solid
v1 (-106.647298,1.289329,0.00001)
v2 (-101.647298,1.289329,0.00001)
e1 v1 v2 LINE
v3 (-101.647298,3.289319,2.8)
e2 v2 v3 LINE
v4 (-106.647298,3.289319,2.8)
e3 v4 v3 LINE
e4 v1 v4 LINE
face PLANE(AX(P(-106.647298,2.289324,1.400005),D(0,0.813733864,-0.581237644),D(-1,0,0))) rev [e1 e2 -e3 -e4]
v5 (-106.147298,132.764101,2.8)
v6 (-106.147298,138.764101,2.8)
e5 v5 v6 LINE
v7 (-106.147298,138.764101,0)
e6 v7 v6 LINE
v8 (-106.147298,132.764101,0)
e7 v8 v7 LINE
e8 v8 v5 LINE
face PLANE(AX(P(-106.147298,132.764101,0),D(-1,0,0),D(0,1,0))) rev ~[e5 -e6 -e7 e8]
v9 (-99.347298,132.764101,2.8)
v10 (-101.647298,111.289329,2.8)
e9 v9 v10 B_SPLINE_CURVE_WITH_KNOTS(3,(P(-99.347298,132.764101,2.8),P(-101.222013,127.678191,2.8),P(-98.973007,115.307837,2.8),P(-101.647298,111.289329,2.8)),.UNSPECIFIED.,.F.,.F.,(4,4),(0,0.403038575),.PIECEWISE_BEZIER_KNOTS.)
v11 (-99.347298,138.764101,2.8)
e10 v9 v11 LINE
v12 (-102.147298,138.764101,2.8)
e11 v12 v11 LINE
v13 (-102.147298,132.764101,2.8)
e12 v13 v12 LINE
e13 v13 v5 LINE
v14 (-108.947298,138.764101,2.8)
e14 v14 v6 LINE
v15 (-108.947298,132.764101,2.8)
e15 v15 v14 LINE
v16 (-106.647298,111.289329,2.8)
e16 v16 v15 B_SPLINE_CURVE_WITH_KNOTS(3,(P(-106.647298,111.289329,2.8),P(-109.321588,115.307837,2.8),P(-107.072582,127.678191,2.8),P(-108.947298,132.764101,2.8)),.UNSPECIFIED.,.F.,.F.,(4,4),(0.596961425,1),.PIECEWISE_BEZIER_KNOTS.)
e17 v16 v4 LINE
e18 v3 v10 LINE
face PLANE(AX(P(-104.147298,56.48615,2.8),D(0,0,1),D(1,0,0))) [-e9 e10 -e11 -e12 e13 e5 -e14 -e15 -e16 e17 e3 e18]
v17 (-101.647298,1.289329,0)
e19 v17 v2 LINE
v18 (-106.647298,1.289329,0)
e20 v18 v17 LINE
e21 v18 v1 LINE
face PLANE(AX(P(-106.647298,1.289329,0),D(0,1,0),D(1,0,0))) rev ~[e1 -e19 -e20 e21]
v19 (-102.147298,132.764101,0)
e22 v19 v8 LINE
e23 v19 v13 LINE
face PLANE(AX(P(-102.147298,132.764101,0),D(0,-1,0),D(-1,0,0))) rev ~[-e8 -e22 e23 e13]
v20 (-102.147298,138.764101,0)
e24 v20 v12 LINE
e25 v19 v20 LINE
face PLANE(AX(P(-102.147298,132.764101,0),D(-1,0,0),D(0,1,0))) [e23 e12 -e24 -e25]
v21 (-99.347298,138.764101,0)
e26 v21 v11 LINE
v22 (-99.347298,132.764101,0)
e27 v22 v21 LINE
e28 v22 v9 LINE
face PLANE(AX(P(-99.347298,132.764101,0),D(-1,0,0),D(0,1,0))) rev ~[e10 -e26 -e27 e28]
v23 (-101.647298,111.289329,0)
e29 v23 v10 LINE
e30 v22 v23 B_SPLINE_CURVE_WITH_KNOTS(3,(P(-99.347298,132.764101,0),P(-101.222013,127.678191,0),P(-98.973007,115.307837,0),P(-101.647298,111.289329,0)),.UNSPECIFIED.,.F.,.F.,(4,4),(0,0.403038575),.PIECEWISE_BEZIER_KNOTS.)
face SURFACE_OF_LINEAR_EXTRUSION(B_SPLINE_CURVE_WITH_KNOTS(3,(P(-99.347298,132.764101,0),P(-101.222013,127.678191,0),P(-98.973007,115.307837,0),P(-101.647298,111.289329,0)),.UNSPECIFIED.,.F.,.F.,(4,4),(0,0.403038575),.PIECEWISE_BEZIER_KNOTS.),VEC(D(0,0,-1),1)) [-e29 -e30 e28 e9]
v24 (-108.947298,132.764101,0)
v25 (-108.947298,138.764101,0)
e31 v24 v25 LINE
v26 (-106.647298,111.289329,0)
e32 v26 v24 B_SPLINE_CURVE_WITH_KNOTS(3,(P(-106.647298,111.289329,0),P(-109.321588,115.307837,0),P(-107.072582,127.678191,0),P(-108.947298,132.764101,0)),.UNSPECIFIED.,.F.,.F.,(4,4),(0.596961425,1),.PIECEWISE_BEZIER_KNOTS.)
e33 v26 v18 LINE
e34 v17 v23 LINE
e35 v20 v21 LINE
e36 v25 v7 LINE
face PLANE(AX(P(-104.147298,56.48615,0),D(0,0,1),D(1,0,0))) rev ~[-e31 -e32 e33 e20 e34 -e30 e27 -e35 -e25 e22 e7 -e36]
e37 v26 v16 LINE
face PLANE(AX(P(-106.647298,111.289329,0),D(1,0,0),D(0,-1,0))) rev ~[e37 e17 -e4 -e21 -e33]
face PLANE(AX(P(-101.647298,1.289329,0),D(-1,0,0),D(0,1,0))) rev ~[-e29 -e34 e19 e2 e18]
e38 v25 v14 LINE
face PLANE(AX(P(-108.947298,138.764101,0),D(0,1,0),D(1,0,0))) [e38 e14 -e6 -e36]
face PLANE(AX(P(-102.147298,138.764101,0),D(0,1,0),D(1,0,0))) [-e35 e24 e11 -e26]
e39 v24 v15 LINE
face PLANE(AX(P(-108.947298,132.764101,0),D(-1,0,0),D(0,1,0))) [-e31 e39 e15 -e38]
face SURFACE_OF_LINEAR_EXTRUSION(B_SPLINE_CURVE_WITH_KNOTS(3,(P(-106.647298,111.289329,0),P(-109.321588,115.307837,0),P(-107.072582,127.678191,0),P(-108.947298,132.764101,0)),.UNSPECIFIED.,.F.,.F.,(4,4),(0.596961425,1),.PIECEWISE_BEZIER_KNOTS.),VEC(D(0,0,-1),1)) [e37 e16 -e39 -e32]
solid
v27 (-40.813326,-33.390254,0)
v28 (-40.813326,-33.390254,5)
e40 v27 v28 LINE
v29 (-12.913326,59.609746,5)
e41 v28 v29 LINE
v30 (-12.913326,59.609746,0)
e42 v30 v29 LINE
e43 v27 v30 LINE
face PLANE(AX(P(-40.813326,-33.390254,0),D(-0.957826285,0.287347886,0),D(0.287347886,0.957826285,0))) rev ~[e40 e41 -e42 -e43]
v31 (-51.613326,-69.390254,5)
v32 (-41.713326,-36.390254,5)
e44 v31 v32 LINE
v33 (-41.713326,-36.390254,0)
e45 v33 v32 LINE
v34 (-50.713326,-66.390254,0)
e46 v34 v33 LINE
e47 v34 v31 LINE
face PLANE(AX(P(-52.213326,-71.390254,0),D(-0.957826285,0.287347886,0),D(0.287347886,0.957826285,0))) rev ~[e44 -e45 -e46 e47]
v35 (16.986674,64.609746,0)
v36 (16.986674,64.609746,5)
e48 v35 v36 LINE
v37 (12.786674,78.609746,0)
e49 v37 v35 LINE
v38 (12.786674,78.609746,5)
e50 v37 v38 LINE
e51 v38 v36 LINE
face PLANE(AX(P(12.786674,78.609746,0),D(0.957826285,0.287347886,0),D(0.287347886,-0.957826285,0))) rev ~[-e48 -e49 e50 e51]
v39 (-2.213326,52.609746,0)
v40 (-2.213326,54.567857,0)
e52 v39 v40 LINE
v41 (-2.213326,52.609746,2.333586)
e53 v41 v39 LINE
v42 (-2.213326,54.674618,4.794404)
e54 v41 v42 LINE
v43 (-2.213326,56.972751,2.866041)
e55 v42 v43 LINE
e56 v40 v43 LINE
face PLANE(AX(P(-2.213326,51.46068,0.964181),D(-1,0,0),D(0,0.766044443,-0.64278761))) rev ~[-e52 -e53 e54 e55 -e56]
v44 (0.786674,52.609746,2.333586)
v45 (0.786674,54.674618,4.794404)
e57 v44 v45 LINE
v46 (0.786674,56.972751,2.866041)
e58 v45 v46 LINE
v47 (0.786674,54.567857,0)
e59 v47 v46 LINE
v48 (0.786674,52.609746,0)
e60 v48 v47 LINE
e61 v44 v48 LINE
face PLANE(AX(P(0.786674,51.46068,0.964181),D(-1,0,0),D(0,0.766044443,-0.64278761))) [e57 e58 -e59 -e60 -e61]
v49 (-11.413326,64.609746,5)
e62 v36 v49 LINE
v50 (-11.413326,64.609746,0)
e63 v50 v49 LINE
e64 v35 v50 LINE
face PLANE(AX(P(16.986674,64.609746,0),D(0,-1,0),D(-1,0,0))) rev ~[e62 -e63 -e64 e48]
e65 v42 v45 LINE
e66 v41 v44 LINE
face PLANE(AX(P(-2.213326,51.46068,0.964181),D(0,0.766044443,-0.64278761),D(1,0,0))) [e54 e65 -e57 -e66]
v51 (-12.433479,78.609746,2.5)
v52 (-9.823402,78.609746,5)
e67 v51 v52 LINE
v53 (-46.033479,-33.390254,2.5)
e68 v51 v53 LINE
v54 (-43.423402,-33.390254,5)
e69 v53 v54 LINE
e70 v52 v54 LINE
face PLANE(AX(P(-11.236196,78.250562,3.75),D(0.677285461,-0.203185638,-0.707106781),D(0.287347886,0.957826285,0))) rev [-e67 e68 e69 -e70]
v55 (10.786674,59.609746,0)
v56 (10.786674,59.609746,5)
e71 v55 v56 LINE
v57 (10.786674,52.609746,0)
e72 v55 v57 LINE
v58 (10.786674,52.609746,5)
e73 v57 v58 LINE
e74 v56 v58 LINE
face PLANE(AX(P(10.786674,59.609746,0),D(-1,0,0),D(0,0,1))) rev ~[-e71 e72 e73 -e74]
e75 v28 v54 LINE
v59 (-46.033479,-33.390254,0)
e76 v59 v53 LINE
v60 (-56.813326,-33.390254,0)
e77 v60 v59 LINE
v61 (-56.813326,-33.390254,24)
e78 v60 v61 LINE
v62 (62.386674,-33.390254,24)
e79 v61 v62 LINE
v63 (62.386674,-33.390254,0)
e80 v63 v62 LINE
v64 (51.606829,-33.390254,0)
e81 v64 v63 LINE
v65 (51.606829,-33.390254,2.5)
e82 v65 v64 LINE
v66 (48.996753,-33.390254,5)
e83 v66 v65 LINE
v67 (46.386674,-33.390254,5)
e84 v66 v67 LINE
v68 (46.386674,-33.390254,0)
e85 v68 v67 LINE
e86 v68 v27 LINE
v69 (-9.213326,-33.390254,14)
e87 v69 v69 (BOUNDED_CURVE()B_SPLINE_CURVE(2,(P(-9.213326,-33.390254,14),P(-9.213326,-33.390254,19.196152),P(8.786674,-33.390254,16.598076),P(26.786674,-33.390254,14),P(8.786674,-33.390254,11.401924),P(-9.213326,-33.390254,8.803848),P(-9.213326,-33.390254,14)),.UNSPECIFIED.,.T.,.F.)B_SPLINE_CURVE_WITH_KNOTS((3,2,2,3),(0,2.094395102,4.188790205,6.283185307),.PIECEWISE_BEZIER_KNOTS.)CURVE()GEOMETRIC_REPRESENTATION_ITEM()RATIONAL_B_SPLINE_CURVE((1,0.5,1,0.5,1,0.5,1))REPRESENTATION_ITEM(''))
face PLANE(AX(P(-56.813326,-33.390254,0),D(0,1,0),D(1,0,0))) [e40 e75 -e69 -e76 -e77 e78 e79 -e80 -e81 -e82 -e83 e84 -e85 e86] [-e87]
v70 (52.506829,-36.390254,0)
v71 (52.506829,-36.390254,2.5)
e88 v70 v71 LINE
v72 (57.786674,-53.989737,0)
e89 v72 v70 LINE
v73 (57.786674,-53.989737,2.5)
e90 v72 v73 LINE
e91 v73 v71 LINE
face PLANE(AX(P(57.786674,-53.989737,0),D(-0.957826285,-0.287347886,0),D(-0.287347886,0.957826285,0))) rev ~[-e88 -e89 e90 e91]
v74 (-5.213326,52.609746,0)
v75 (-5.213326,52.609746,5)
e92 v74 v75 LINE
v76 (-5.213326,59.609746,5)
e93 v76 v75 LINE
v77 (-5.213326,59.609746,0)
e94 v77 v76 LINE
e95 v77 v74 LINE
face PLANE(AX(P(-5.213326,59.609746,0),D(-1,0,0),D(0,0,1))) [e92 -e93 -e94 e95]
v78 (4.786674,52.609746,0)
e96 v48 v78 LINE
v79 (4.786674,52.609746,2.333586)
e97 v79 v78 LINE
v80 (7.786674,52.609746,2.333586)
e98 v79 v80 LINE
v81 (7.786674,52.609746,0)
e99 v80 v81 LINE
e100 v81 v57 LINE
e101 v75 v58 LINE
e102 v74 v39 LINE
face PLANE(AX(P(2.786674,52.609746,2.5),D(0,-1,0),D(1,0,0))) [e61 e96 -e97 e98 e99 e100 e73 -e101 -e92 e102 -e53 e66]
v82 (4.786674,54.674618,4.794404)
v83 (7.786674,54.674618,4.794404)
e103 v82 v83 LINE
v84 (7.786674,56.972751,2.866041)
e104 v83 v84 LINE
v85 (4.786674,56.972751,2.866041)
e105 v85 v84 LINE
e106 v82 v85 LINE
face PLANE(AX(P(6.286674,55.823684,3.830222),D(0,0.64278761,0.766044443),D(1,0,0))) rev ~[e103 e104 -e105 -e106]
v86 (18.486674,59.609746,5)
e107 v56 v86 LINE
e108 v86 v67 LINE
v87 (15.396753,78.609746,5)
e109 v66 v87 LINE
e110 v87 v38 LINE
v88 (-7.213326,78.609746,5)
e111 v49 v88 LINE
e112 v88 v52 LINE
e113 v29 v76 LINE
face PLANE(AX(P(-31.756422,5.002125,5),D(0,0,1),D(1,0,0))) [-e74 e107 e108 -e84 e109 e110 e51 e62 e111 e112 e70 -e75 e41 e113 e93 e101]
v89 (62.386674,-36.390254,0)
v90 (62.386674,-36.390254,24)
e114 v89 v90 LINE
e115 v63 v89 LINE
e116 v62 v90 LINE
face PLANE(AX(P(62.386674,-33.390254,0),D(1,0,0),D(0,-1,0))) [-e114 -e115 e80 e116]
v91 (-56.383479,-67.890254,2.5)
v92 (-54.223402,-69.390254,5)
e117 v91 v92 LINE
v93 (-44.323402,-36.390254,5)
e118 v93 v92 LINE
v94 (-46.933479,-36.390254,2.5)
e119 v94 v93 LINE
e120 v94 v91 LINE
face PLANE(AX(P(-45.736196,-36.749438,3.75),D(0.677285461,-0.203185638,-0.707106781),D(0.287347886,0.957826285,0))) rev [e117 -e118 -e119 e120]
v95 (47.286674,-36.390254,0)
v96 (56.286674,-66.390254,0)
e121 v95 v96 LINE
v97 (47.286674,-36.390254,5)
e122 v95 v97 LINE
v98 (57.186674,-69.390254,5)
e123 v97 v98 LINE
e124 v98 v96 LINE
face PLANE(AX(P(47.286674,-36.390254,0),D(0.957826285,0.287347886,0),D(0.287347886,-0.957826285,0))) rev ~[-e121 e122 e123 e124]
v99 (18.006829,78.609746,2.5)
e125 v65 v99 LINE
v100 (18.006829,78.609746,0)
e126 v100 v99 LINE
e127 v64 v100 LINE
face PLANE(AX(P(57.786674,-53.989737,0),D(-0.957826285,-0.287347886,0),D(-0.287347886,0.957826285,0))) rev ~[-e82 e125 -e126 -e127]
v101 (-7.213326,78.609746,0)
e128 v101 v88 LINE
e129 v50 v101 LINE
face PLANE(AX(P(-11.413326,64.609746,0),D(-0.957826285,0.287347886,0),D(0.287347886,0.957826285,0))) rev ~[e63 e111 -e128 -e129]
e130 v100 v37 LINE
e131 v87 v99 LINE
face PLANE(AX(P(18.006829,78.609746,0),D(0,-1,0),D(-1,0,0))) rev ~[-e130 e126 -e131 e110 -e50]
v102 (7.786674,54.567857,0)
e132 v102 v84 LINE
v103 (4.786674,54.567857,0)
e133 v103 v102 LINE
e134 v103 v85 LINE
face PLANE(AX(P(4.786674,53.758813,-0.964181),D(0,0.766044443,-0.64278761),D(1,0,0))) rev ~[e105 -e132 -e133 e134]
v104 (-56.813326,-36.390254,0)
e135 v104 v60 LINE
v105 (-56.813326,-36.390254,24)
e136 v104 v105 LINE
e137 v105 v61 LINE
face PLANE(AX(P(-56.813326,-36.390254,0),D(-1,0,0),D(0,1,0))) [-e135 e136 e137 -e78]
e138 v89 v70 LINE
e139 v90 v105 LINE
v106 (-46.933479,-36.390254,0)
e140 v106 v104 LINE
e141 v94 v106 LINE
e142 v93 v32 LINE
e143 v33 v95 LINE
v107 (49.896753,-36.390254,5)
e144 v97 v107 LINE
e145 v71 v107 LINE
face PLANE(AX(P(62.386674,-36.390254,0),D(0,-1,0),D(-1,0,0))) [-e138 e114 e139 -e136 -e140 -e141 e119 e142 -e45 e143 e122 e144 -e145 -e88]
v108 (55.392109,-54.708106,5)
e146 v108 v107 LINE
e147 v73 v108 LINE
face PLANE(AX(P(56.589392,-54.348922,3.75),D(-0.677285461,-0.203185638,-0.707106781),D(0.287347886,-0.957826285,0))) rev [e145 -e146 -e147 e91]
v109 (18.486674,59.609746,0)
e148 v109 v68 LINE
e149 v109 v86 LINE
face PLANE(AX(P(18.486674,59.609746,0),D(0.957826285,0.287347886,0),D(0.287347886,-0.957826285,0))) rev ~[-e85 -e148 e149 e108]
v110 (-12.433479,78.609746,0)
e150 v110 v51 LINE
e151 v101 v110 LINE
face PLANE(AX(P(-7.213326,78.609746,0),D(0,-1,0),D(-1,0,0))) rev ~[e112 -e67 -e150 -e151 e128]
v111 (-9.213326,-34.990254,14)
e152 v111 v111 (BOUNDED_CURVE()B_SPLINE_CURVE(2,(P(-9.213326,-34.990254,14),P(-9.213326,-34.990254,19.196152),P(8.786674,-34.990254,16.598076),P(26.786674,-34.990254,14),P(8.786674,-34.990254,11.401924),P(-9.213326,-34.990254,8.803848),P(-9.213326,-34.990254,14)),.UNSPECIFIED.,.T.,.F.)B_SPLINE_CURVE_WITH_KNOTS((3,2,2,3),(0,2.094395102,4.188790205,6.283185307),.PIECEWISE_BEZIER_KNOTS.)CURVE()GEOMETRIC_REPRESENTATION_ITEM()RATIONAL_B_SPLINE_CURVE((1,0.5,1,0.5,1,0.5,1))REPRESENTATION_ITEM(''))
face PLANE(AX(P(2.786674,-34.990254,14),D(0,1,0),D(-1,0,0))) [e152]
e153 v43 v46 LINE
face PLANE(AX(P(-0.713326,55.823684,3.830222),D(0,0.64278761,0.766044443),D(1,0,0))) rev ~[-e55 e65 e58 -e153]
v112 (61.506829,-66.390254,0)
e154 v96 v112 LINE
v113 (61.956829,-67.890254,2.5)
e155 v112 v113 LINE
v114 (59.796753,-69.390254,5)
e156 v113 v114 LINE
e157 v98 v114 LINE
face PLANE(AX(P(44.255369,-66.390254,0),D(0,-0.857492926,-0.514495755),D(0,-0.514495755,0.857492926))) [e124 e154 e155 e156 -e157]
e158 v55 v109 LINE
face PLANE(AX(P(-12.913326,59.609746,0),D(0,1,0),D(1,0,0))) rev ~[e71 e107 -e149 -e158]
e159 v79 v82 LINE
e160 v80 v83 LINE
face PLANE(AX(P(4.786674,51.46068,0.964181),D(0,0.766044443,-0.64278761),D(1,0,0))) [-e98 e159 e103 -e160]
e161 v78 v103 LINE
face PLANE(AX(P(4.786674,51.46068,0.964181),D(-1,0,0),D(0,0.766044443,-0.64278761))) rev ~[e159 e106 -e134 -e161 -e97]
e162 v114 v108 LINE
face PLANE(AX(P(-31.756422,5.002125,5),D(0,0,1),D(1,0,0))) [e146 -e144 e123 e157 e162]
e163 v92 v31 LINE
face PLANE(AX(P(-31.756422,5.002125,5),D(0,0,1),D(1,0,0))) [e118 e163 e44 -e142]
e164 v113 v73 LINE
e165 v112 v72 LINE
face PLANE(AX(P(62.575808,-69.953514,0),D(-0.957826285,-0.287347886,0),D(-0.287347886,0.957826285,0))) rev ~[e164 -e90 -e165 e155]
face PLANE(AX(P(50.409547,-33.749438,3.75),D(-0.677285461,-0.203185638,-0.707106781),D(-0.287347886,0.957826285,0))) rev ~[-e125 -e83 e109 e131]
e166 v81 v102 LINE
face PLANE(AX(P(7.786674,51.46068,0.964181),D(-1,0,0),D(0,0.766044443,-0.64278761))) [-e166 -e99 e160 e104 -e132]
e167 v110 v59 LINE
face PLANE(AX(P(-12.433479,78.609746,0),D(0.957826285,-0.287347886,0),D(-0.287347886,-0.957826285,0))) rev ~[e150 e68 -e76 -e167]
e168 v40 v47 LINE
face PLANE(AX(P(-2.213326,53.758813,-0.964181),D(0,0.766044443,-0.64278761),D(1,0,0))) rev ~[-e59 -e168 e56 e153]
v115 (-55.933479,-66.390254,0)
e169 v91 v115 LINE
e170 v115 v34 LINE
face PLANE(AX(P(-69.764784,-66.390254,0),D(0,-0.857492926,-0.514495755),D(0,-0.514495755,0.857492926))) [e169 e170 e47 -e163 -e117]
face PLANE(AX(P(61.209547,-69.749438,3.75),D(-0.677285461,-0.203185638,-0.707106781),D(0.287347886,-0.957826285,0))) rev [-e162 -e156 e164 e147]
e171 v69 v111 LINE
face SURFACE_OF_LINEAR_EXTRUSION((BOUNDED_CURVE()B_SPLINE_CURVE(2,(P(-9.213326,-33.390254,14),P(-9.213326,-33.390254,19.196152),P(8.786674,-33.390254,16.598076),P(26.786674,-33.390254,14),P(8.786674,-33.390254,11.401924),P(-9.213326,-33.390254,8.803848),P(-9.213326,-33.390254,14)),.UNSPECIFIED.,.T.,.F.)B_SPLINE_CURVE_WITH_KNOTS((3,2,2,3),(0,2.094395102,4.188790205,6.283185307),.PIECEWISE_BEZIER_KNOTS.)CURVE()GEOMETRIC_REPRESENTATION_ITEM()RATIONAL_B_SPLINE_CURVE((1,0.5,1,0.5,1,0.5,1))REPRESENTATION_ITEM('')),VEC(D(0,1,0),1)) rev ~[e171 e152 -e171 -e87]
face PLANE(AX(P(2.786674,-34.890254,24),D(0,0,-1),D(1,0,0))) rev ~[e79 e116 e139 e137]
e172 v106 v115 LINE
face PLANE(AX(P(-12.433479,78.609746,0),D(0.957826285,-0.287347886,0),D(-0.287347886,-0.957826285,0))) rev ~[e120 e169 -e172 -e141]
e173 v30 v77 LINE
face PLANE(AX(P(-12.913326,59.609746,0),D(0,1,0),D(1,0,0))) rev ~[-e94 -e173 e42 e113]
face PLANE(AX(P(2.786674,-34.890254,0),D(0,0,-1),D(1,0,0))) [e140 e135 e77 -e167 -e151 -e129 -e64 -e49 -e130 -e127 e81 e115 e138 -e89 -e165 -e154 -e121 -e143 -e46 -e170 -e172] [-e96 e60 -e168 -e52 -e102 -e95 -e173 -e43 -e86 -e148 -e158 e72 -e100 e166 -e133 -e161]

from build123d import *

# Parameters (mm, degrees)
F1_DEPTH     = 5
F3_DEPTH     = 24
F4_W         = 16
F4_H         = 5
F5_DEPTH     = 7
F7_W         = 3
F7_H         = 3
F8_DEPTH     = 5
F9_W         = 2.8
F9_H         = 6
F10_DEPTH    = 2.8
F11_SIZE2    = 1.99999
F11_SIZE     = 2.79999
F13_W        = 140.8556848764
F13_H        = 22.6161023602
F14_DEPTH    = 2
F15_T1_DEPTH = 31.0827660092
F15_T3_DEPTH = 31.0827642559
F17_DEPTH    = 1.6
F18_SIZE     = 2.5


# Not quite as in the source:
# - a fillet or chamfer that OpenCascade refuses, or shapes differently, is made with other operations: its cross-section is extruded or revolved along the edge and cut away or added
# - a fillet or chamfer is up to 0.001 mm smaller than in the source, because OpenCascade refuses the exact size


with BuildPart() as f1:
    # F0 (on Top) → F1 (new body)
    with BuildSketch(Plane.XY):
        Polygon((-11.4133255483, 64.60974645), (-7.2133255483, 78.60974645), (-12.4334788322, 78.60974645), (-52.2133255483, -53.9897426034), (-52.2133255483, -71.39025355), (-41.7133255483, -36.39025355), (-40.8133255483, -33.39025355), (-12.9133255483, 59.60974645), align=None)
        Polygon((16.9866744517, 64.60974645), (-11.4133255483, 64.60974645), (-12.9133255483, 59.60974645), (18.4866744517, 59.60974645), align=None)
        Polygon((18.006829489, 78.60974645), (12.7866744517, 78.60974645), (16.9866744517, 64.60974645), (18.4866744517, 59.60974645), (46.3866744517, -33.39025355), (47.2866744517, -36.39025355), (57.7866744517, -71.39025355), (57.7866744517, -53.989736759), align=None)
        Polygon((46.3866744517, -33.39025355), (-40.8133255483, -33.39025355), (-41.7133255483, -36.39025355), (47.2866744517, -36.39025355), align=None)
        Polygon((-52.2133255483, -71.39025355), (-52.2133255483, -53.9897426034), (-57.0024570015, -69.953514114), align=None)
        Polygon((62.5758075135, -69.9535136315), (57.7866744517, -53.989736759), (57.7866744517, -71.39025355), align=None)
    extrude(amount=F1_DEPTH)

    # F2 (on face) → F3 (join)
    with BuildSketch(Plane(origin=(0, 0, 0), x_dir=(1, 0, 0), z_dir=(0, 0, -1))):
        Polygon((-56.8133255483, 33.39025355), (-40.8133255483, 33.39025355), (46.3866744517, 33.39025355), (62.3866744517, 33.39025355), (62.3866744517, 36.39025355), (47.2866744517, 36.39025355), (-41.7133255483, 36.39025355), (-56.8133255483, 36.39025355), align=None)
    extrude(amount=-F3_DEPTH)

    # F4 (on face) → F5 (join)
    with BuildSketch(Plane.XZ.offset(-59.60974645)):
        with Locations((2.7866744517, 2.5)):
            Rectangle(F4_W, F4_H)
    extrude(amount=F5_DEPTH)

    # F7 (on face) → F8 (cut)
    with BuildSketch(Plane(origin=(0, 21.7370799257, 25.905243094), x_dir=(1, 0, 0), z_dir=(0, 0.6427876097, 0.7660444431))):
        with Locations((6.2866744517, 40.3014039219)):
            Rectangle(F7_W, F7_H)
        with Locations((-0.7133255483, 40.3014039219)):
            Rectangle(F7_W, F7_H)
    extrude(amount=F8_DEPTH, mode=Mode.SUBTRACT)

    # F13 (on 3pt) → F14 (cut)
    with BuildSketch(Plane.XZ.offset(71.39025355)):
        with Locations((4.5045018196, 1.0812641121)):
            Rectangle(F13_W, F13_H)
    extrude(amount=-F14_DEPTH, mode=Mode.SUBTRACT)

    # F15: chamfer of 5 x 3 on 2 edges, made by hand

    # F15_s2 → F15_t1 (cut)
    with BuildSketch(Plane.YZ.offset(44.2553689658)):
        Polygon((-66.39025355, 0), (-69.39025355, 5), (-69.39025355, 0), align=None)
    extrude(amount=F15_T1_DEPTH, mode=Mode.SUBTRACT)

    # F15_s4 → F15_t3 (cut)
    with BuildSketch(Plane.YZ.offset(-69.7647843182)):
        Polygon((-66.39025355, 0), (-69.39025355, 5), (-69.39025355, 0), align=None)
    extrude(amount=F15_T3_DEPTH, mode=Mode.SUBTRACT)

    # F16 (on face) → F17 (cut)
    with BuildSketch(Plane(origin=(0, -33.39025355, 0), x_dir=(-1, 0, 0), z_dir=(0, 1, 0))):
        with BuildLine():
            add(Edge.make_bspline(
                [(9.2133255483, 14), (9.2133255483, 19.1961524227), (-8.7866744517, 16.5980762114), (-26.7866744517, 14), (-8.7866744517, 11.4019237886), (9.2133255483, 8.8038475773), (9.2133255483, 14)],
                knots=[0, 0, 0, 2.0943951024, 2.0943951024, 4.1887902048, 4.1887902048, 6.2831853072, 6.2831853072, 6.2831853072], degree=2, weights=[1, 0.5, 1, 0.5, 1, 0.5, 1]))
        make_face()
    extrude(amount=-F17_DEPTH, mode=Mode.SUBTRACT)

    # F18
    f18_edges = [f1.edges().sort_by_distance(p)[0] for p in [
        (-29.233479, 22.609746, 5),
        (34.806829, 22.609746, 5),
        (-51.883479, -52.890254, 5),
        (57.456829, -52.890254, 5),
    ]]
    chamfer(f18_edges, length=F18_SIZE)


with BuildPart() as f10:
    # F9 (on Top) → F10 (new body)
    with BuildSketch(Plane.XY):
        with BuildLine():
            Line((-106.6472975697, 1.2893290818), (-101.6472975697, 1.2893290818))
            Line((-101.6472975697, 1.2893290818), (-101.6472975697, 111.2893290818))
            add(Edge.make_bspline(
                [(-101.6472975697, 111.2893290818), (-102.9340378828, 109.355815566), (-105.3605572566, 109.355815566), (-106.6472975697, 111.2893290818)],
                knots=[0.403038575, 0.403038575, 0.403038575, 0.403038575, 0.596961425, 0.596961425, 0.596961425, 0.596961425], degree=3))
            Line((-106.6472975697, 111.2893290818), (-106.6472975697, 1.2893290818))
        make_face()
        with BuildLine():
            Line((-106.6472975697, 111.2893290818), (-101.6472975697, 111.2893290818))
            add(Edge.make_bspline(
                [(-99.3472975697, 132.7641010284), (-101.2220129553, 127.6781910253), (-98.973007346, 115.3078371211), (-101.6472975697, 111.2893290818)],
                knots=[0, 0, 0, 0, 0.403038575, 0.403038575, 0.403038575, 0.403038575], degree=3))
            Line((-99.3472975697, 132.7641010284), (-102.1472975697, 132.7641010284))
            Line((-102.1472975697, 132.7641010284), (-106.1472975697, 132.7641010284))
            Line((-106.1472975697, 132.7641010284), (-108.9472975697, 132.7641010284))
            add(Edge.make_bspline(
                [(-106.6472975697, 111.2893290818), (-109.3215877933, 115.3078371211), (-107.072582184, 127.6781910253), (-108.9472975697, 132.7641010284)],
                knots=[0.596961425, 0.596961425, 0.596961425, 0.596961425, 1, 1, 1, 1], degree=3))
        make_face()
        with Locations((-100.7472975697, 135.7641010284)):
            Rectangle(F9_W, F9_H)
        with Locations((-107.5472975697, 135.7641010284)):
            Rectangle(F9_W, F9_H)
        with BuildLine():
            add(Edge.make_bspline(
                [(-101.6472975697, 111.2893290818), (-102.9340378828, 109.355815566), (-105.3605572566, 109.355815566), (-106.6472975697, 111.2893290818)],
                knots=[0.403038575, 0.403038575, 0.403038575, 0.403038575, 0.596961425, 0.596961425, 0.596961425, 0.596961425], degree=3))
            Line((-101.6472975697, 111.2893290818), (-106.6472975697, 111.2893290818))
        make_face()
    extrude(amount=F10_DEPTH)

    # F11 (size 2.8 and 2 in the source; OpenCascade refuses exactly that, so slightly less here)
    f11_edges = [f10.edges().sort_by_distance(p)[0] for p in [
        (-104.147298, 1.289329, 2.8),
    ]]
    f11_side = f10.faces().sort_by_distance((-104.147298, 1.289329, 1.4))[0]
    chamfer(f11_edges, length=F11_SIZE, length2=F11_SIZE2, reference=f11_side)


solid = Compound([f1.part, f10.part])
